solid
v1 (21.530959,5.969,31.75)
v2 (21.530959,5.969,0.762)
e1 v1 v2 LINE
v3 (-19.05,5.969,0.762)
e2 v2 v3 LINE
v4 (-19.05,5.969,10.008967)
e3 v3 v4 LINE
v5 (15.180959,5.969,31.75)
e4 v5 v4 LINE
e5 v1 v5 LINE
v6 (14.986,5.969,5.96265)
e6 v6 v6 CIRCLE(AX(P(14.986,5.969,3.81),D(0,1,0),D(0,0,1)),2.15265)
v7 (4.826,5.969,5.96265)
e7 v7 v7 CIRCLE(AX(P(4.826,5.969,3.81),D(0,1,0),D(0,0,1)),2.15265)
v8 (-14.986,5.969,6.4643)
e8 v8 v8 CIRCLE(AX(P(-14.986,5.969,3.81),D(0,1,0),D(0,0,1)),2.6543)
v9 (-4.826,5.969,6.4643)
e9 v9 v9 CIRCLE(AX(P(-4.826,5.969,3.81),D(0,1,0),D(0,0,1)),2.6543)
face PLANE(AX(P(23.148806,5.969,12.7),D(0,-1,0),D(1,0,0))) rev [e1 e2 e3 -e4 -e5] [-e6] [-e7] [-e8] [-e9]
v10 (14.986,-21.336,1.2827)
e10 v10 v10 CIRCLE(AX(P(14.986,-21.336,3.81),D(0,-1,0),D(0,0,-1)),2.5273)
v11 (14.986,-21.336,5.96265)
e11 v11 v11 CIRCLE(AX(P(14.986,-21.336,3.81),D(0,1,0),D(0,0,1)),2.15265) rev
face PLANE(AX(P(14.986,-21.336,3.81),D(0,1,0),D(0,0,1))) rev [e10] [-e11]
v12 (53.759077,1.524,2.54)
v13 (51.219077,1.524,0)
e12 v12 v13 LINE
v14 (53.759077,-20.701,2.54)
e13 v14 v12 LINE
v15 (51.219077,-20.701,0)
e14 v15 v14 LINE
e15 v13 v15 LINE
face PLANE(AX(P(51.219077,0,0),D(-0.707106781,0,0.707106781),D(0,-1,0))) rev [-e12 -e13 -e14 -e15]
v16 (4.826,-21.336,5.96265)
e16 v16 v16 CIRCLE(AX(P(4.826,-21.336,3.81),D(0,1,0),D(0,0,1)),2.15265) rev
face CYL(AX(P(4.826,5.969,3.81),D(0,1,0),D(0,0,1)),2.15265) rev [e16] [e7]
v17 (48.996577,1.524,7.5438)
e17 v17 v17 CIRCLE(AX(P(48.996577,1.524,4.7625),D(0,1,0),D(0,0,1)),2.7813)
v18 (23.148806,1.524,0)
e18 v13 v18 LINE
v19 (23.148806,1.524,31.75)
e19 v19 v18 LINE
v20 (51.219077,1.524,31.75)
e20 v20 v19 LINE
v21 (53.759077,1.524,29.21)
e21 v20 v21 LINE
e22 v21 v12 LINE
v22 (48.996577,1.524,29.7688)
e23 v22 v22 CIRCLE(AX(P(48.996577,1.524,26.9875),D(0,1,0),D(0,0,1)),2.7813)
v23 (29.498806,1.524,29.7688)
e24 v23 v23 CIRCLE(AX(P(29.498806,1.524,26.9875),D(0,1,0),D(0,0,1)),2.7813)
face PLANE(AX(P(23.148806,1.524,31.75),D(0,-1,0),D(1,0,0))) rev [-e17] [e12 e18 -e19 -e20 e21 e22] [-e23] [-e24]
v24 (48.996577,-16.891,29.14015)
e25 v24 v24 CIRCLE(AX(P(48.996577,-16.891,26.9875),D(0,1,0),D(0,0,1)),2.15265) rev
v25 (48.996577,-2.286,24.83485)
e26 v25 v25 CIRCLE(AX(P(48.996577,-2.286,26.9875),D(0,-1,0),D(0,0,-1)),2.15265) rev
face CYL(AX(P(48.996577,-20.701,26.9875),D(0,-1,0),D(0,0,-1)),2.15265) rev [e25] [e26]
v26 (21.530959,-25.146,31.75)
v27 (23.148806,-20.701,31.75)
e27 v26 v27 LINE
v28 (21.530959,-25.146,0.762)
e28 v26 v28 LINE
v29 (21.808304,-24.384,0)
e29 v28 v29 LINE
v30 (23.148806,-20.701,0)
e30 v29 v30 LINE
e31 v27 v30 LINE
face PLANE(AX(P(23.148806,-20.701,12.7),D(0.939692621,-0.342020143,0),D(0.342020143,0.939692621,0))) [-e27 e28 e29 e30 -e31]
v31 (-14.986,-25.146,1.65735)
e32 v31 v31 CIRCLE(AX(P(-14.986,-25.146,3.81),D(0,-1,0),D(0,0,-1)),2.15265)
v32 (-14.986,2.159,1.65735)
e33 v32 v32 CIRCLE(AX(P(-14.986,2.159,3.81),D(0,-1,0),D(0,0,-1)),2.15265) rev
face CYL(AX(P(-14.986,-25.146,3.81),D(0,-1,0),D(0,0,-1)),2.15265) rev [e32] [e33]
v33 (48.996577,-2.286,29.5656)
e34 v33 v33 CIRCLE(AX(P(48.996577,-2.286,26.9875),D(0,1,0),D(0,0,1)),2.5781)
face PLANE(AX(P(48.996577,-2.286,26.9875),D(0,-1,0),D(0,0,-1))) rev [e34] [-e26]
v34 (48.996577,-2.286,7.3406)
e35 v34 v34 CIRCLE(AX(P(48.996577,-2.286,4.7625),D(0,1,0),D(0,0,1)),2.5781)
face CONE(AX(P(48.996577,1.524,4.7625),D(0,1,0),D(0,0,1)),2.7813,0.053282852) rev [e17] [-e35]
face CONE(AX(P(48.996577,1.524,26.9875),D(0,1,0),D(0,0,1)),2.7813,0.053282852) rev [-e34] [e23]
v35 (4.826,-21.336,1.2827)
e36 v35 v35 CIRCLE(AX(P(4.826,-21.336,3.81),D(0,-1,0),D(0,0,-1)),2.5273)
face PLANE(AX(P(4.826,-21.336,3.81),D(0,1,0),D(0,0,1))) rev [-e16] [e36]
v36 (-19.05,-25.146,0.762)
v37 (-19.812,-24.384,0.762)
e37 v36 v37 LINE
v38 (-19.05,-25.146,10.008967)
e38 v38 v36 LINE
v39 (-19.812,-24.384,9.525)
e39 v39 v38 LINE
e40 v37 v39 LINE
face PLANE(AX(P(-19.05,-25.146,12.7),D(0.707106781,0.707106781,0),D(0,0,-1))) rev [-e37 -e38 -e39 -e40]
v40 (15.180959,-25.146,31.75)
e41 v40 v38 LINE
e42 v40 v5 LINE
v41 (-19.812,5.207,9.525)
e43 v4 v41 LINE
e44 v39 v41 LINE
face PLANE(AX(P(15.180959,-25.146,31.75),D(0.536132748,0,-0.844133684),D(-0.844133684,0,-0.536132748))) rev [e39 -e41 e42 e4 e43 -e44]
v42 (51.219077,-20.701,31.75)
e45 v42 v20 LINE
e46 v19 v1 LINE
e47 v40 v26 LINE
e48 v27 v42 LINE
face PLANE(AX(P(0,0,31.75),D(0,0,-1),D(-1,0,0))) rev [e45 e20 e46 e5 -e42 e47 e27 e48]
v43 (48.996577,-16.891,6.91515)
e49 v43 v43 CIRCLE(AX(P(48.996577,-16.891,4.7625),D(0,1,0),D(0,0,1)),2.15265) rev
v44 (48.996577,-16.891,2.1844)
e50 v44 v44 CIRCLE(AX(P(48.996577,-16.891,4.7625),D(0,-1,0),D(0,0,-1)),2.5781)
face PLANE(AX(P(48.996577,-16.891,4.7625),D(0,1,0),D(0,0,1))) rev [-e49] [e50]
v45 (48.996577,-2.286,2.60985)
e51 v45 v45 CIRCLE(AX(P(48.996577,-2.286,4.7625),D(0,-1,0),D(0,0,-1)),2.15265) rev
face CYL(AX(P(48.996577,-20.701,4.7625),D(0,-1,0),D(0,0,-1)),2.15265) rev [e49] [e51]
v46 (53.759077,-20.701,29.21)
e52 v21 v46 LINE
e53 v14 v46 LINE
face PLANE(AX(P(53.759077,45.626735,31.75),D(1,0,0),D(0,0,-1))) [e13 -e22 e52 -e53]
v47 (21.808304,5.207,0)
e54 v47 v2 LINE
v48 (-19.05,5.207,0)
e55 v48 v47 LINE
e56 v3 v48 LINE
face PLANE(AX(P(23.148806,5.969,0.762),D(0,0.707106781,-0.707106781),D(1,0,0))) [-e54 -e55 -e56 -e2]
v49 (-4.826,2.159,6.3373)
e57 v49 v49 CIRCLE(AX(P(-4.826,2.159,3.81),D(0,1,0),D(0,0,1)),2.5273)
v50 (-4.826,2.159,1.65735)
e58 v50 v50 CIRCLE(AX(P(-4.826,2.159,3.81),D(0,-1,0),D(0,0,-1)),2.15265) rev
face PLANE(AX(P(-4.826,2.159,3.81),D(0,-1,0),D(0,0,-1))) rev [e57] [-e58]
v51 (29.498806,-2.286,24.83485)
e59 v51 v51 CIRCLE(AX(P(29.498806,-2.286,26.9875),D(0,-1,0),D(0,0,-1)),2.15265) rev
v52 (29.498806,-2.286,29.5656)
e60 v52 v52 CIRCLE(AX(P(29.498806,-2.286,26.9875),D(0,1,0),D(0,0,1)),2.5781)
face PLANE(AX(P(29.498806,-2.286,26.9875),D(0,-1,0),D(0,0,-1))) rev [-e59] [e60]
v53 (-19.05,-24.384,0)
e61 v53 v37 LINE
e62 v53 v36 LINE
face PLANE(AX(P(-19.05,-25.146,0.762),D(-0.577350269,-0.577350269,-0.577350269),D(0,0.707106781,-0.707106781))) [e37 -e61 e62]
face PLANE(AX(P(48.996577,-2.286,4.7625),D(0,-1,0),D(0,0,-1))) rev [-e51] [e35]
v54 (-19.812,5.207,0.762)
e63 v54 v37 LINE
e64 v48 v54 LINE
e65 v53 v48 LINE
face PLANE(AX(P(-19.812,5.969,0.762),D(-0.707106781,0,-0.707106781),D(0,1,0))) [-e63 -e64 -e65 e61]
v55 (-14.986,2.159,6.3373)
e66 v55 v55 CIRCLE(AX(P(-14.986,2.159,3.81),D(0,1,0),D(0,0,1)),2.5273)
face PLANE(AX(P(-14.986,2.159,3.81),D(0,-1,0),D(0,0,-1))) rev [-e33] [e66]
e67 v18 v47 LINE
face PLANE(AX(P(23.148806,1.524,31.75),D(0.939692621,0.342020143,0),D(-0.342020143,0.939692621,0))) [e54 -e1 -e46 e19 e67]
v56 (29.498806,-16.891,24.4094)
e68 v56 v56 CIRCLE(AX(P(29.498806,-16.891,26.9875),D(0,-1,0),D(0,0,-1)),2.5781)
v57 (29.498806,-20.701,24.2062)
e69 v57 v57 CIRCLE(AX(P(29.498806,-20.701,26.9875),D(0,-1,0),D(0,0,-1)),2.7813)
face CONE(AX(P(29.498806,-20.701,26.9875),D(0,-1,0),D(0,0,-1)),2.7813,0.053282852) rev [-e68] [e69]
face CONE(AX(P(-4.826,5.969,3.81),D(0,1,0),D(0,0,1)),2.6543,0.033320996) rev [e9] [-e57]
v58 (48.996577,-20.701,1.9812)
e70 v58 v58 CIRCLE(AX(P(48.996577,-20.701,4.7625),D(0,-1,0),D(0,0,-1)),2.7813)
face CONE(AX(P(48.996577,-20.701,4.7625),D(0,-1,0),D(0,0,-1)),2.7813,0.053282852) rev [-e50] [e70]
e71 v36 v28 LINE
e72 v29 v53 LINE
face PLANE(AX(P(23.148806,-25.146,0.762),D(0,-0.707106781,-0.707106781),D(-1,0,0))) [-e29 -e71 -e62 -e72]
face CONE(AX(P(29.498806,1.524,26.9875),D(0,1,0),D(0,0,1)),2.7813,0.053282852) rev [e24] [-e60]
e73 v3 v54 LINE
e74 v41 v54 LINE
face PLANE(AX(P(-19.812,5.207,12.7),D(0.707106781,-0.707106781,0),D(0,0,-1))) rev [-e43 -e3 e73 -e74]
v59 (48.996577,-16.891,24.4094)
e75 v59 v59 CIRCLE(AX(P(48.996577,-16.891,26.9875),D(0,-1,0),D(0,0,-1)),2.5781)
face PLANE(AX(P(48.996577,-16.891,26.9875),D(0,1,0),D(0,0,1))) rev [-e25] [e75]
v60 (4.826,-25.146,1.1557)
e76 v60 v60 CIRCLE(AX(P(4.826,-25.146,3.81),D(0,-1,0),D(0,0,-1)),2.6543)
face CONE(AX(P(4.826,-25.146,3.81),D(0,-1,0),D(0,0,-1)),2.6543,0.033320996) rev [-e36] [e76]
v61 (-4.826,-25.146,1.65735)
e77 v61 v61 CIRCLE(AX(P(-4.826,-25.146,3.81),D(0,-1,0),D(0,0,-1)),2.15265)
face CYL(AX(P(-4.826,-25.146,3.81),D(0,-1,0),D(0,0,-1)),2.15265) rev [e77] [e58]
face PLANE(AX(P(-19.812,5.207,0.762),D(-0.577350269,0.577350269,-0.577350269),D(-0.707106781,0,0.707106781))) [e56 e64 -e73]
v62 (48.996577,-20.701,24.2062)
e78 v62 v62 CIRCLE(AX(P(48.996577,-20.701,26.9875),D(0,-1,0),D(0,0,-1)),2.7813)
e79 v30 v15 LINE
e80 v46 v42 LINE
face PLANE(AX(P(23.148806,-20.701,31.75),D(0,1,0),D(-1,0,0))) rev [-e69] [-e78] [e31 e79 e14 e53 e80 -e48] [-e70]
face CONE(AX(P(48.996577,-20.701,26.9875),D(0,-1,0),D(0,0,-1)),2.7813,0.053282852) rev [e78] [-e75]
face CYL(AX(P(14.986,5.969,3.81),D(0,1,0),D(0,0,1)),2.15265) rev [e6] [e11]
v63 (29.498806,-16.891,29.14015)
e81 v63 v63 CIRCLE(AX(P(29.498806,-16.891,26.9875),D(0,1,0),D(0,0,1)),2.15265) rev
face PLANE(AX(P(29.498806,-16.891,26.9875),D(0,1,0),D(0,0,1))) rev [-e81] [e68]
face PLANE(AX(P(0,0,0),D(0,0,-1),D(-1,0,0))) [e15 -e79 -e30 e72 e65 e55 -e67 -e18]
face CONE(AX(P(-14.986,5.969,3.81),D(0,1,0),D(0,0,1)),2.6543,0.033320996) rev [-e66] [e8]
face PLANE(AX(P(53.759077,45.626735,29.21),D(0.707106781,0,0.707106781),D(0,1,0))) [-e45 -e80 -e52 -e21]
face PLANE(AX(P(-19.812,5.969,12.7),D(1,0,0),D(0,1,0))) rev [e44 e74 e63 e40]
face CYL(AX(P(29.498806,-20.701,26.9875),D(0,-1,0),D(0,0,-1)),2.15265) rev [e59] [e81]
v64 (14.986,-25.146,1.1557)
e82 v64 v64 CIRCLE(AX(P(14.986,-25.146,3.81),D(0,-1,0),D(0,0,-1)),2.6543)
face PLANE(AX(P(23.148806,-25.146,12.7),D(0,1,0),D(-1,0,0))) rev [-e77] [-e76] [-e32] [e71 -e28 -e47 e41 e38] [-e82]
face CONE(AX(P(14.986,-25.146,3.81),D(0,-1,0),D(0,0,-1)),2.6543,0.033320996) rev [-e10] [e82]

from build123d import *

# Parameters (mm, degrees)
SKETCH1_W                       = 42.960806382
SKETCH1_H                       = 31.115
BOSS_EXTRUDE1_DEPTH             = 12.7
SKETCH2_W                       = 42.960806382
SKETCH2_H                       = 22.225
BOSS_EXTRUDE2_DEPTH             = 19.05
BOSS_EXTRUDE3_DEPTH             = 22.225
DRAFT1_START                    = 15
DRAFT1_OUTLINE_W                = 22.225
DRAFT1_OUTLINE_H                = 19.270002336
DRAFT1_DEPTH                    = 6.752762537
BOSS_EXTRUDE4_REACH             = 69.308
SKETCH6_W                       = 42.960806382
SKETCH6_H                       = 4.445
DRAFT3_ANGLE                    = 20
DRAFT4_ANGLE                    = 20
BOSS_EXTRUDE5_DEPTH             = 22.225
F_6_CLEARANCE_HOLE1_D           = 4.3053
F_6_CLEARANCE_HOLE2_D           = 4.3053
F_6_CLEARANCE_HOLE2_ON_FACE_2_D = 4.3053
HOLE1_AT_2_COUNT                = 2
HOLE1_AT_2_PITCH                = 10.16
HOLE2_AT_2_COUNT                = 2
HOLE2_AT_2_PITCH                = 10.16
CUT_EXTRUDE1_DEPTH              = 70.758470007
CHAMFER1_SIZE                   = 2.54
CHAMFER2_SIZE                   = 0.762
HOLE3_AT_2_COUNT                = 2
HOLE3_AT_2_PITCH                = 19.49777111
HOLE3_AT_3_COUNT                = 2
HOLE3_AT_3_PITCH                = 29.565413971
HOLE4_AT_2_COUNT                = 2
HOLE4_AT_2_PITCH                = 22.225
HOLE4_AT_3_COUNT                = 2
HOLE4_AT_3_PITCH                = 29.565413971


with BuildPart() as part:
    # Sketch1 → Boss-Extrude1 (new body)
    with BuildSketch(Plane.XY):
        with Locations((1.668403191, -9.5885)):
            Rectangle(SKETCH1_W, SKETCH1_H)
    extrude(amount=BOSS_EXTRUDE1_DEPTH)

    # Sketch2 → Boss-Extrude2 (add)
    with BuildSketch(Plane.XY.offset(12.7)):
        with Locations((1.668403191, -9.5885)):
            Rectangle(SKETCH2_W, SKETCH2_H)
    extrude(amount=BOSS_EXTRUDE2_DEPTH)

    # Sketch3 → Boss-Extrude3 (add)
    with BuildSketch(Plane.XZ.offset(20.701)):
        Polygon((23.148806382, 31.75), (53.759077492, 31.75), (53.759077492, 0), (44.234077492, 0), (44.234077492, 18.107878998), (23.148806382, 18.107878998), align=None)
    extrude(amount=-BOSS_EXTRUDE3_DEPTH)

    # Draft1: read off the stored shape, not the designer's step
    # Draft1 outline → Draft1 (add)
    with BuildSketch(Plane(origin=(0, 0, 0), x_dir=(0, 1, 0), z_dir=(0.9396926207859083, 0, -0.3420201433256691)).offset(DRAFT1_START)):
        with Locations((-9.5885, 17.552359245)):
            Rectangle(DRAFT1_OUTLINE_W, DRAFT1_OUTLINE_H)
    extrude(amount=DRAFT1_DEPTH)

    # Sketch6 → Boss-Extrude4 (add, up to next)
    with BuildSketch(Plane.XY.offset(31.75), mode=Mode.PRIVATE) as boss_extrude4_sk1:
        with Locations((1.668403191, 3.7465)):
            Rectangle(SKETCH6_W, SKETCH6_H)
    boss_extrude4_tool1 = extrude(boss_extrude4_sk1.sketch, amount=-BOSS_EXTRUDE4_REACH, mode=Mode.PRIVATE) - part.part
    # Sketch6 → Boss-Extrude4 (add, up to next)
    with BuildSketch(Plane.XY.offset(31.75), mode=Mode.PRIVATE) as boss_extrude4_sk2:
        with Locations((1.668403191, -22.9235)):
            Rectangle(SKETCH6_W, SKETCH6_H)
    boss_extrude4_tool2 = extrude(boss_extrude4_sk2.sketch, amount=-BOSS_EXTRUDE4_REACH, mode=Mode.PRIVATE) - part.part
    add(boss_extrude4_tool1.solids().sort_by_distance((1.668403, 3.7465, 31.75))[0])
    add(boss_extrude4_tool2.solids().sort_by_distance((1.668403, -22.9235, 31.75))[0])

    # Draft3
    draft3_faces = [part.faces().sort_by_distance(p)[0] for p in [
        (23.148806382, -22.9235, 15.875),
    ]]
    draft(draft3_faces, Plane(origin=(23.148806382, -20.701, 31.75), x_dir=(-1, 0, 0), z_dir=(0, -1, 0)), DRAFT3_ANGLE)

    # Draft4
    draft4_faces = [part.faces().sort_by_distance(p)[0] for p in [
        (23.148806382, 3.7465, 15.875),
    ]]
    draft(draft4_faces, Plane(origin=(23.148806382, 1.524, 31.75), x_dir=(1, 0, 0), z_dir=(0, 1, 0)), DRAFT4_ANGLE)

    # Sketch8 → Boss-Extrude5 (add)
    with BuildSketch(Plane.XZ.offset(20.701)):
        Polygon((29.739535343, 18.107878998), (23.148806382, 0), (44.234077492, 0), (44.234077492, 18.107878998), align=None)
    extrude(amount=-BOSS_EXTRUDE5_DEPTH)

    # #6 Clearance Hole1 (through all)
    with Locations(Plane(origin=(0, -20.701, 0), x_dir=(-1, 0, 0), z_dir=(0, -1, 0))):
        with Locations((-48.996577492, -26.9875), (-48.996577492, -4.7625), (-29.498806382, -26.9875)):
            Hole(F_6_CLEARANCE_HOLE1_D / 2)

    # #6 Clearance Hole2 (through all)
    with Locations(Plane(origin=(-14.986, -25.146, 3.81), x_dir=(-1, 0, 0), z_dir=(0, -1, 0))):
        with Locations((0, 0), (-10.16, 0)):
            Hole(F_6_CLEARANCE_HOLE2_D / 2)

    # #6 Clearance Hole2 on face 2 (through all)
    with Locations(Plane(origin=(14.986, 5.969, 3.81), x_dir=(0, 0, 1), z_dir=(0, 1, 0))):
        with Locations((0, 0), (0, -10.16)):
            Hole(F_6_CLEARANCE_HOLE2_ON_FACE_2_D / 2)

    # Sketch18 → Hole1 (revolve, cut)
    with BuildSketch(Plane(origin=(-4.826, 5.969, 3.81), x_dir=(0, 0, 1), z_dir=(1, 0, 0))):
        Polygon((0, 0), (0, 3.81), (2.5273, 3.81), (2.6543, 0), align=None)
    hole1 = revolve(axis=Axis((-4.826, -104.031, 3.81), (0, 1, 0)), mode=Mode.SUBTRACT)

    # Hole1 at 2: Hole1 ×2
    with Locations(*[(-i * HOLE1_AT_2_PITCH, 0, 0) for i in range(1, HOLE1_AT_2_COUNT)]):
        add(hole1, mode=Mode.SUBTRACT)

    # Sketch20 → Hole2 (revolve, cut)
    with BuildSketch(Plane(origin=(4.826, -25.146, 3.81), x_dir=(0, 0, -1), z_dir=(1, 0, 0))):
        Polygon((0, 0), (0, 3.81), (2.5273, 3.81), (2.6543, 0), align=None)
    hole2 = revolve(axis=Axis((4.826, 84.854, 3.81), (0, -1, 0)), mode=Mode.SUBTRACT)

    # Hole2 at 2: Hole2 ×2
    with Locations(*[(i * HOLE2_AT_2_PITCH, 0, 0) for i in range(1, HOLE2_AT_2_COUNT)]):
        add(hole2, mode=Mode.SUBTRACT)

    # Sketch21 → Cut-Extrude1 (cut, through all)
    with BuildSketch(Plane(origin=(0, 5.969, 0), x_dir=(1, 0, 0), z_dir=(0, 1, 0))):
        Polygon((-19.812, -9.525), (-19.812, -31.75), (15.180958691, -31.75), align=None)
    extrude(amount=-CUT_EXTRUDE1_DEPTH, mode=Mode.SUBTRACT)

    # Chamfer1
    chamfer1_edges = [part.edges().sort_by_distance(p)[0] for p in [
        (53.759077492, -9.5885, 31.75),
        (53.759077492, -9.5885, 0),
    ]]
    chamfer(chamfer1_edges, length=CHAMFER1_SIZE)

    # Chamfer2
    chamfer2_edges = [part.edges().sort_by_distance(p)[0] for p in [
        (-19.812, -25.146, 4.7625),
        (-19.812, 5.969, 4.7625),
        (0.859479345, -25.146, 0),
        (-19.812, -9.5885, 0),
        (0.859479345, 5.969, 0),
    ]]
    chamfer(chamfer2_edges, length=CHAMFER2_SIZE)

    # Sketch23 → Hole3 (revolve, cut)
    with BuildSketch(Plane(origin=(29.498806382, 1.524, 26.9875), x_dir=(0, 0, 1), z_dir=(1, 0, 0))):
        Polygon((0, 0), (0, 3.81), (2.5781, 3.81), (2.7813, 0), align=None)
    hole3 = revolve(axis=Axis((29.498806382, -108.476, 26.9875), (0, 1, 0)), mode=Mode.SUBTRACT)

    # Hole3 at 2: Hole3 ×2
    with Locations(*[(i * HOLE3_AT_2_PITCH, 0, 0) for i in range(1, HOLE3_AT_2_COUNT)]):
        add(hole3, mode=Mode.SUBTRACT)

    # Hole3 at 3: Hole3 ×2
    with Locations(*[Vector(0.6594790497158223, 0, -0.7517229429689612) * (i * HOLE3_AT_3_PITCH) for i in range(1, HOLE3_AT_3_COUNT)]):
        add(hole3, mode=Mode.SUBTRACT)

    # Sketch25 → Hole4 (revolve, cut)
    with BuildSketch(Plane(origin=(48.996577492, -20.701, 4.7625), x_dir=(0, 0, -1), z_dir=(1, 0, 0))):
        Polygon((0, 0), (0, 3.81), (2.5781, 3.81), (2.7813, 0), align=None)
    hole4 = revolve(axis=Axis((48.996577492, 89.299, 4.7625), (0, -1, 0)), mode=Mode.SUBTRACT)

    # Hole4 at 2: Hole4 ×2
    with Locations(*[(0, 0, i * HOLE4_AT_2_PITCH) for i in range(1, HOLE4_AT_2_COUNT)]):
        add(hole4, mode=Mode.SUBTRACT)

    # Hole4 at 3: Hole4 ×2
    with Locations(*[Vector(-0.6594790497158223, 0, 0.7517229429689612) * (i * HOLE4_AT_3_PITCH) for i in range(1, HOLE4_AT_3_COUNT)]):
        add(hole4, mode=Mode.SUBTRACT)


solid = part.part
